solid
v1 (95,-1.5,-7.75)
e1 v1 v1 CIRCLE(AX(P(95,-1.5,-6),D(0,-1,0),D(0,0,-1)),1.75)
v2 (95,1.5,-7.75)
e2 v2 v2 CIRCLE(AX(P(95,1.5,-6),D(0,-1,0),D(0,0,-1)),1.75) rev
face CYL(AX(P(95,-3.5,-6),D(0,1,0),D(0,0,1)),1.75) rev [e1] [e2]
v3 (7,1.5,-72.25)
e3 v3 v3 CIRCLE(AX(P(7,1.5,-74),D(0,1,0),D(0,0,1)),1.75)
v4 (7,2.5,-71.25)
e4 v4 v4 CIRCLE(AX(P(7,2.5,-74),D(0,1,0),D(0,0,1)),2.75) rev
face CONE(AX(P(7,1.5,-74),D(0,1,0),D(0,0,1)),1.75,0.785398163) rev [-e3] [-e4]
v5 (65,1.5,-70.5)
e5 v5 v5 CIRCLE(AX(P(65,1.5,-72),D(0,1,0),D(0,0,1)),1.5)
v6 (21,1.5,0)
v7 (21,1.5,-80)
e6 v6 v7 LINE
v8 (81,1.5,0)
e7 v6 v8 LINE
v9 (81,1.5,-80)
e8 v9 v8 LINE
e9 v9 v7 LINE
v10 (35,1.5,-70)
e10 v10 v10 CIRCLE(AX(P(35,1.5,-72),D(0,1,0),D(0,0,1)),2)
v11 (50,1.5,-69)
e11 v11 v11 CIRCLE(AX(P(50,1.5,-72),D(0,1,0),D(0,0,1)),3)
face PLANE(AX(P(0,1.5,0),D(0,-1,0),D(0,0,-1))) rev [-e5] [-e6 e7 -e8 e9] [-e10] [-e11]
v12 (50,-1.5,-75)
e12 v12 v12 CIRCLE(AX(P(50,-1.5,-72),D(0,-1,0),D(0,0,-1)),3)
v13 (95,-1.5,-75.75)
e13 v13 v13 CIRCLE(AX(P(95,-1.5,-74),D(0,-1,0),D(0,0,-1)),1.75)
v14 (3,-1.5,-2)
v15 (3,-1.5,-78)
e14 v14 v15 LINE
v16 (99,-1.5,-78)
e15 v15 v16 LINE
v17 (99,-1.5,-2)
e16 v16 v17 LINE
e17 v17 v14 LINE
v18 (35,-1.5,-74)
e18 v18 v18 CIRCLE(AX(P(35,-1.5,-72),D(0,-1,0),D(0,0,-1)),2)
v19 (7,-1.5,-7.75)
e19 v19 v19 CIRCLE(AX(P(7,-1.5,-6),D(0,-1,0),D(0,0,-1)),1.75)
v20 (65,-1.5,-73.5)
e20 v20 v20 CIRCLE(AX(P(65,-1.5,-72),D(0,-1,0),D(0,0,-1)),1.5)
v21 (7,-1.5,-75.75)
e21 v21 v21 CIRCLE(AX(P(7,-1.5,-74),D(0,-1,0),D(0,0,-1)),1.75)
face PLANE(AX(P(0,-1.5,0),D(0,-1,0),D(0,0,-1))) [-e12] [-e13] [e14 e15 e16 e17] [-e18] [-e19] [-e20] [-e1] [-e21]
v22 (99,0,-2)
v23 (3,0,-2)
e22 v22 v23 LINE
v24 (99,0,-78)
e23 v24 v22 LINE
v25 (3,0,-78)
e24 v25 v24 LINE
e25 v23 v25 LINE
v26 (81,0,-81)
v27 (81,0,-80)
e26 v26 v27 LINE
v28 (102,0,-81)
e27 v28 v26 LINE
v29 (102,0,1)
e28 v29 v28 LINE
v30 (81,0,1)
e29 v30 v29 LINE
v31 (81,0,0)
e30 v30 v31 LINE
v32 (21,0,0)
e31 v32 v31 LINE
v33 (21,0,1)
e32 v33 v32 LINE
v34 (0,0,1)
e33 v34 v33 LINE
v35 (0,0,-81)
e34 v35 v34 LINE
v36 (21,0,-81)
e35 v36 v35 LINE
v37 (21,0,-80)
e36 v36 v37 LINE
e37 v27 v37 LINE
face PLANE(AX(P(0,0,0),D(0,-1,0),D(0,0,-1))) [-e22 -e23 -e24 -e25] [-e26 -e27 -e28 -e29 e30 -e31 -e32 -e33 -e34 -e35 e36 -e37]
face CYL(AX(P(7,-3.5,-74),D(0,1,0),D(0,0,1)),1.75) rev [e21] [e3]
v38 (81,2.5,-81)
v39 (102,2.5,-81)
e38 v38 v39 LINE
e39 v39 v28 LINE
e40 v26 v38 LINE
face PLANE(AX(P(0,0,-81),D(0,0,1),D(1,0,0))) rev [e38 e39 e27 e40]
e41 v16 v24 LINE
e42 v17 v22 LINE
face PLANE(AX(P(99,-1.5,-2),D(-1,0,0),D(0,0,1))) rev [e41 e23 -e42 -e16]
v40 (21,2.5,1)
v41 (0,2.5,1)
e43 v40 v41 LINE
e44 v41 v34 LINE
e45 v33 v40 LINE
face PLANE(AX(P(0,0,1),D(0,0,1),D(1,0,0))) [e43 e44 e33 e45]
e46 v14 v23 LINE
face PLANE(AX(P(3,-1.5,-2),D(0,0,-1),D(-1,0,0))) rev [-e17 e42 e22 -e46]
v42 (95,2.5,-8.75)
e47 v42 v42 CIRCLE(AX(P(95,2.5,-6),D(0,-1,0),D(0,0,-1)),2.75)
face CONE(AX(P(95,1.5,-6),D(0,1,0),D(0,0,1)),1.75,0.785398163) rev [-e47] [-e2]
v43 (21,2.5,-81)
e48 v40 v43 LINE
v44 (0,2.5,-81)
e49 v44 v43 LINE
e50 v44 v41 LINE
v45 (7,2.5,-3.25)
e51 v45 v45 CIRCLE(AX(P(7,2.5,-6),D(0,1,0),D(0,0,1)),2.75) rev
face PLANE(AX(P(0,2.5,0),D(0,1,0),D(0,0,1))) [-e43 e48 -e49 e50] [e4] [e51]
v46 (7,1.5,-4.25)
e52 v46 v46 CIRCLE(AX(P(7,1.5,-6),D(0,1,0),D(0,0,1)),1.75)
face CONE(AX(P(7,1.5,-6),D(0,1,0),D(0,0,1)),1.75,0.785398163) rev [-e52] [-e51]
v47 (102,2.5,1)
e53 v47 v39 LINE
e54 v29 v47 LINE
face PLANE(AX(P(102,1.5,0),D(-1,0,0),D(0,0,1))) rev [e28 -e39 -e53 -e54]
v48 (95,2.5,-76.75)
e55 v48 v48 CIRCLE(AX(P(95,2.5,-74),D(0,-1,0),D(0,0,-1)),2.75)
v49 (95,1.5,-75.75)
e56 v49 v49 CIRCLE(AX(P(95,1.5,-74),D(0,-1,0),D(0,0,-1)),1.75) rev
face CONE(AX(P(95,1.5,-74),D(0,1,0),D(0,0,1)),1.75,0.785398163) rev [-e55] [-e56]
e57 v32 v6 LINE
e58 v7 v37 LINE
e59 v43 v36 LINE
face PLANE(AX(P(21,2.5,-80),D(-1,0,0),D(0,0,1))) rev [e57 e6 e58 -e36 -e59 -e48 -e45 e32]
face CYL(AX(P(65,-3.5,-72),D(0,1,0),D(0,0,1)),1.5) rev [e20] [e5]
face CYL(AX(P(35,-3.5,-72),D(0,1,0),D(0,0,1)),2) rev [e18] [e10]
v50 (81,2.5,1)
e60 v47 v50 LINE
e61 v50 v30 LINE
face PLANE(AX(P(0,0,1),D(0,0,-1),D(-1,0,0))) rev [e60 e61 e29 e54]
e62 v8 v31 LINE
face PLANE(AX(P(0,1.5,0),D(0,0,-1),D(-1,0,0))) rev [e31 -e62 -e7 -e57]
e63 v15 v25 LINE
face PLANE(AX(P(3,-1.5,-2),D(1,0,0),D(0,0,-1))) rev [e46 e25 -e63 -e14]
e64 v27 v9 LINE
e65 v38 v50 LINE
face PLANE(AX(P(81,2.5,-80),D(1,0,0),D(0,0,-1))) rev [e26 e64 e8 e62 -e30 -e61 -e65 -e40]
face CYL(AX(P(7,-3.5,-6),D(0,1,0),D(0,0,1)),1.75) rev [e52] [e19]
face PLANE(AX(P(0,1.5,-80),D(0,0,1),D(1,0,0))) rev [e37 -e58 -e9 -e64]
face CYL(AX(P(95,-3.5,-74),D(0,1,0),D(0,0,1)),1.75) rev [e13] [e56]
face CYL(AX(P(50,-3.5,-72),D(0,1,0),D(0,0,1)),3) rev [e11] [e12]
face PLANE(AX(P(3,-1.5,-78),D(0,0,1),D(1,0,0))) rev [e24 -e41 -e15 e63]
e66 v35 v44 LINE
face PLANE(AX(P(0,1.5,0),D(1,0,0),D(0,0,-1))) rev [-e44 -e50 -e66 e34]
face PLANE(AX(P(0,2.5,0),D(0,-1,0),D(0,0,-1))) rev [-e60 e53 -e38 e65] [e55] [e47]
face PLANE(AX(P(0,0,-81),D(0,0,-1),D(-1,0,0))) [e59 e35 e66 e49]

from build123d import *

# Parameters (mm, degrees)
ESQUISSE1_W             = 102
ESQUISSE1_H             = 80
BOSS_EXTRU_1_DEPTH      = 1.5
ESQUISSE2_W             = 96
ESQUISSE2_H             = 76
BOSS_EXTRU_2_DEPTH      = 1.5
ESQUISSE3_R             = 1.75
ESQUISSE3_R_2           = 2
ESQUISSE3_R_3           = 3
ESQUISSE3_R_4           = 1.5
ENL_V_MAT_EXTRU_1_DEPTH = 5
BOSS_EXTRU_5_START      = 1
ESQUISSE6_W             = 21
ESQUISSE6_H             = 80
ESQUISSE6_R             = 1.75
BOSS_EXTRU_5_DEPTH      = 1
CHANFREIN2_SIZE         = 1
ESQUISSE7_W             = 21
ESQUISSE7_H             = 2.5
BOSS_EXTRU_6_DEPTH      = 1
ESQUISSE8_W             = 21
ESQUISSE8_H             = 2.5
BOSS_EXTRU_7_DEPTH      = 1


with BuildPart() as part:
    # Esquisse1 → Boss.-Extru.1 (new body)
    with BuildSketch(Plane(origin=(0, 0, 0), x_dir=(1, 0, 0), z_dir=(0, 1, 0))):
        with Locations((51, 40)):
            Rectangle(ESQUISSE1_W, ESQUISSE1_H)
    extrude(amount=BOSS_EXTRU_1_DEPTH)

    # Esquisse2 → Boss.-Extru.2 (add)
    with BuildSketch(Plane.XZ):
        with Locations((51, -40)):
            Rectangle(ESQUISSE2_W, ESQUISSE2_H)
    extrude(amount=BOSS_EXTRU_2_DEPTH)

    # Esquisse3 → Enlèv. mat.-Extru.1 (cut)
    with BuildSketch(Plane(origin=(0, 1.5, 0), x_dir=(1, 0, 0), z_dir=(0, 1, 0))):
        with Locations((7, 74)):
            Circle(ESQUISSE3_R)
        with Locations((7, 6)):
            Circle(ESQUISSE3_R)
        with Locations((95, 6)):
            Circle(ESQUISSE3_R)
        with Locations((95, 74)):
            Circle(ESQUISSE3_R)
        with Locations((35, 72)):
            Circle(ESQUISSE3_R_2)
        with Locations((50, 72)):
            Circle(ESQUISSE3_R_3)
        with Locations((65, 72)):
            Circle(ESQUISSE3_R_4)
    extrude(amount=-ENL_V_MAT_EXTRU_1_DEPTH, mode=Mode.SUBTRACT)

    # Esquisse6 → Boss.-Extru.5 (add)
    # profile 1 of 2: a face of its own
    with BuildSketch(Plane(origin=(0, 1.5, 0), x_dir=(1, 0, 0), z_dir=(0, 1, 0)).offset(BOSS_EXTRU_5_START)):
        with Locations((91.5, 40)):
            Rectangle(ESQUISSE6_W, ESQUISSE6_H)
        with Locations((95, 6)):
            Circle(ESQUISSE6_R, mode=Mode.SUBTRACT)
        with Locations((95, 74)):
            Circle(ESQUISSE6_R, mode=Mode.SUBTRACT)
    # profile 2 of 2: a face of its own
    with BuildSketch(Plane(origin=(0, 1.5, 0), x_dir=(1, 0, 0), z_dir=(0, 1, 0)).offset(BOSS_EXTRU_5_START)):
        with Locations((10.5, 40)):
            Rectangle(ESQUISSE6_W, ESQUISSE6_H)
        with Locations((7, 74)):
            Circle(ESQUISSE6_R, mode=Mode.SUBTRACT)
        with Locations((7, 6)):
            Circle(ESQUISSE6_R, mode=Mode.SUBTRACT)
    extrude(amount=-BOSS_EXTRU_5_DEPTH)

    # Chanfrein2
    chanfrein2_edges = [part.edges().sort_by_distance(p)[0] for p in [
        (5.25, 2.5, -74),
        (5.25, 2.5, -6),
        (93.25, 2.5, -6),
        (93.25, 2.5, -74),
    ]]
    chamfer(chanfrein2_edges, length=CHANFREIN2_SIZE)

    # Esquisse7 → Boss.-Extru.6 (add)
    with BuildSketch(Plane.XY):
        with Locations((10.5, 1.25)):
            Rectangle(ESQUISSE7_W, ESQUISSE7_H)
        with Locations((91.5, 1.25)):
            Rectangle(ESQUISSE7_W, ESQUISSE7_H)
    extrude(amount=BOSS_EXTRU_6_DEPTH)

    # Esquisse8 → Boss.-Extru.7 (add)
    with BuildSketch(Plane(origin=(0, 0, -80), x_dir=(-1, 0, 0), z_dir=(0, 0, -1))):
        with Locations((-91.5, 1.25)):
            Rectangle(ESQUISSE8_W, ESQUISSE8_H)
        with Locations((-10.5, 1.25)):
            Rectangle(ESQUISSE8_W, ESQUISSE8_H)
    extrude(amount=BOSS_EXTRU_7_DEPTH)


solid = part.part
